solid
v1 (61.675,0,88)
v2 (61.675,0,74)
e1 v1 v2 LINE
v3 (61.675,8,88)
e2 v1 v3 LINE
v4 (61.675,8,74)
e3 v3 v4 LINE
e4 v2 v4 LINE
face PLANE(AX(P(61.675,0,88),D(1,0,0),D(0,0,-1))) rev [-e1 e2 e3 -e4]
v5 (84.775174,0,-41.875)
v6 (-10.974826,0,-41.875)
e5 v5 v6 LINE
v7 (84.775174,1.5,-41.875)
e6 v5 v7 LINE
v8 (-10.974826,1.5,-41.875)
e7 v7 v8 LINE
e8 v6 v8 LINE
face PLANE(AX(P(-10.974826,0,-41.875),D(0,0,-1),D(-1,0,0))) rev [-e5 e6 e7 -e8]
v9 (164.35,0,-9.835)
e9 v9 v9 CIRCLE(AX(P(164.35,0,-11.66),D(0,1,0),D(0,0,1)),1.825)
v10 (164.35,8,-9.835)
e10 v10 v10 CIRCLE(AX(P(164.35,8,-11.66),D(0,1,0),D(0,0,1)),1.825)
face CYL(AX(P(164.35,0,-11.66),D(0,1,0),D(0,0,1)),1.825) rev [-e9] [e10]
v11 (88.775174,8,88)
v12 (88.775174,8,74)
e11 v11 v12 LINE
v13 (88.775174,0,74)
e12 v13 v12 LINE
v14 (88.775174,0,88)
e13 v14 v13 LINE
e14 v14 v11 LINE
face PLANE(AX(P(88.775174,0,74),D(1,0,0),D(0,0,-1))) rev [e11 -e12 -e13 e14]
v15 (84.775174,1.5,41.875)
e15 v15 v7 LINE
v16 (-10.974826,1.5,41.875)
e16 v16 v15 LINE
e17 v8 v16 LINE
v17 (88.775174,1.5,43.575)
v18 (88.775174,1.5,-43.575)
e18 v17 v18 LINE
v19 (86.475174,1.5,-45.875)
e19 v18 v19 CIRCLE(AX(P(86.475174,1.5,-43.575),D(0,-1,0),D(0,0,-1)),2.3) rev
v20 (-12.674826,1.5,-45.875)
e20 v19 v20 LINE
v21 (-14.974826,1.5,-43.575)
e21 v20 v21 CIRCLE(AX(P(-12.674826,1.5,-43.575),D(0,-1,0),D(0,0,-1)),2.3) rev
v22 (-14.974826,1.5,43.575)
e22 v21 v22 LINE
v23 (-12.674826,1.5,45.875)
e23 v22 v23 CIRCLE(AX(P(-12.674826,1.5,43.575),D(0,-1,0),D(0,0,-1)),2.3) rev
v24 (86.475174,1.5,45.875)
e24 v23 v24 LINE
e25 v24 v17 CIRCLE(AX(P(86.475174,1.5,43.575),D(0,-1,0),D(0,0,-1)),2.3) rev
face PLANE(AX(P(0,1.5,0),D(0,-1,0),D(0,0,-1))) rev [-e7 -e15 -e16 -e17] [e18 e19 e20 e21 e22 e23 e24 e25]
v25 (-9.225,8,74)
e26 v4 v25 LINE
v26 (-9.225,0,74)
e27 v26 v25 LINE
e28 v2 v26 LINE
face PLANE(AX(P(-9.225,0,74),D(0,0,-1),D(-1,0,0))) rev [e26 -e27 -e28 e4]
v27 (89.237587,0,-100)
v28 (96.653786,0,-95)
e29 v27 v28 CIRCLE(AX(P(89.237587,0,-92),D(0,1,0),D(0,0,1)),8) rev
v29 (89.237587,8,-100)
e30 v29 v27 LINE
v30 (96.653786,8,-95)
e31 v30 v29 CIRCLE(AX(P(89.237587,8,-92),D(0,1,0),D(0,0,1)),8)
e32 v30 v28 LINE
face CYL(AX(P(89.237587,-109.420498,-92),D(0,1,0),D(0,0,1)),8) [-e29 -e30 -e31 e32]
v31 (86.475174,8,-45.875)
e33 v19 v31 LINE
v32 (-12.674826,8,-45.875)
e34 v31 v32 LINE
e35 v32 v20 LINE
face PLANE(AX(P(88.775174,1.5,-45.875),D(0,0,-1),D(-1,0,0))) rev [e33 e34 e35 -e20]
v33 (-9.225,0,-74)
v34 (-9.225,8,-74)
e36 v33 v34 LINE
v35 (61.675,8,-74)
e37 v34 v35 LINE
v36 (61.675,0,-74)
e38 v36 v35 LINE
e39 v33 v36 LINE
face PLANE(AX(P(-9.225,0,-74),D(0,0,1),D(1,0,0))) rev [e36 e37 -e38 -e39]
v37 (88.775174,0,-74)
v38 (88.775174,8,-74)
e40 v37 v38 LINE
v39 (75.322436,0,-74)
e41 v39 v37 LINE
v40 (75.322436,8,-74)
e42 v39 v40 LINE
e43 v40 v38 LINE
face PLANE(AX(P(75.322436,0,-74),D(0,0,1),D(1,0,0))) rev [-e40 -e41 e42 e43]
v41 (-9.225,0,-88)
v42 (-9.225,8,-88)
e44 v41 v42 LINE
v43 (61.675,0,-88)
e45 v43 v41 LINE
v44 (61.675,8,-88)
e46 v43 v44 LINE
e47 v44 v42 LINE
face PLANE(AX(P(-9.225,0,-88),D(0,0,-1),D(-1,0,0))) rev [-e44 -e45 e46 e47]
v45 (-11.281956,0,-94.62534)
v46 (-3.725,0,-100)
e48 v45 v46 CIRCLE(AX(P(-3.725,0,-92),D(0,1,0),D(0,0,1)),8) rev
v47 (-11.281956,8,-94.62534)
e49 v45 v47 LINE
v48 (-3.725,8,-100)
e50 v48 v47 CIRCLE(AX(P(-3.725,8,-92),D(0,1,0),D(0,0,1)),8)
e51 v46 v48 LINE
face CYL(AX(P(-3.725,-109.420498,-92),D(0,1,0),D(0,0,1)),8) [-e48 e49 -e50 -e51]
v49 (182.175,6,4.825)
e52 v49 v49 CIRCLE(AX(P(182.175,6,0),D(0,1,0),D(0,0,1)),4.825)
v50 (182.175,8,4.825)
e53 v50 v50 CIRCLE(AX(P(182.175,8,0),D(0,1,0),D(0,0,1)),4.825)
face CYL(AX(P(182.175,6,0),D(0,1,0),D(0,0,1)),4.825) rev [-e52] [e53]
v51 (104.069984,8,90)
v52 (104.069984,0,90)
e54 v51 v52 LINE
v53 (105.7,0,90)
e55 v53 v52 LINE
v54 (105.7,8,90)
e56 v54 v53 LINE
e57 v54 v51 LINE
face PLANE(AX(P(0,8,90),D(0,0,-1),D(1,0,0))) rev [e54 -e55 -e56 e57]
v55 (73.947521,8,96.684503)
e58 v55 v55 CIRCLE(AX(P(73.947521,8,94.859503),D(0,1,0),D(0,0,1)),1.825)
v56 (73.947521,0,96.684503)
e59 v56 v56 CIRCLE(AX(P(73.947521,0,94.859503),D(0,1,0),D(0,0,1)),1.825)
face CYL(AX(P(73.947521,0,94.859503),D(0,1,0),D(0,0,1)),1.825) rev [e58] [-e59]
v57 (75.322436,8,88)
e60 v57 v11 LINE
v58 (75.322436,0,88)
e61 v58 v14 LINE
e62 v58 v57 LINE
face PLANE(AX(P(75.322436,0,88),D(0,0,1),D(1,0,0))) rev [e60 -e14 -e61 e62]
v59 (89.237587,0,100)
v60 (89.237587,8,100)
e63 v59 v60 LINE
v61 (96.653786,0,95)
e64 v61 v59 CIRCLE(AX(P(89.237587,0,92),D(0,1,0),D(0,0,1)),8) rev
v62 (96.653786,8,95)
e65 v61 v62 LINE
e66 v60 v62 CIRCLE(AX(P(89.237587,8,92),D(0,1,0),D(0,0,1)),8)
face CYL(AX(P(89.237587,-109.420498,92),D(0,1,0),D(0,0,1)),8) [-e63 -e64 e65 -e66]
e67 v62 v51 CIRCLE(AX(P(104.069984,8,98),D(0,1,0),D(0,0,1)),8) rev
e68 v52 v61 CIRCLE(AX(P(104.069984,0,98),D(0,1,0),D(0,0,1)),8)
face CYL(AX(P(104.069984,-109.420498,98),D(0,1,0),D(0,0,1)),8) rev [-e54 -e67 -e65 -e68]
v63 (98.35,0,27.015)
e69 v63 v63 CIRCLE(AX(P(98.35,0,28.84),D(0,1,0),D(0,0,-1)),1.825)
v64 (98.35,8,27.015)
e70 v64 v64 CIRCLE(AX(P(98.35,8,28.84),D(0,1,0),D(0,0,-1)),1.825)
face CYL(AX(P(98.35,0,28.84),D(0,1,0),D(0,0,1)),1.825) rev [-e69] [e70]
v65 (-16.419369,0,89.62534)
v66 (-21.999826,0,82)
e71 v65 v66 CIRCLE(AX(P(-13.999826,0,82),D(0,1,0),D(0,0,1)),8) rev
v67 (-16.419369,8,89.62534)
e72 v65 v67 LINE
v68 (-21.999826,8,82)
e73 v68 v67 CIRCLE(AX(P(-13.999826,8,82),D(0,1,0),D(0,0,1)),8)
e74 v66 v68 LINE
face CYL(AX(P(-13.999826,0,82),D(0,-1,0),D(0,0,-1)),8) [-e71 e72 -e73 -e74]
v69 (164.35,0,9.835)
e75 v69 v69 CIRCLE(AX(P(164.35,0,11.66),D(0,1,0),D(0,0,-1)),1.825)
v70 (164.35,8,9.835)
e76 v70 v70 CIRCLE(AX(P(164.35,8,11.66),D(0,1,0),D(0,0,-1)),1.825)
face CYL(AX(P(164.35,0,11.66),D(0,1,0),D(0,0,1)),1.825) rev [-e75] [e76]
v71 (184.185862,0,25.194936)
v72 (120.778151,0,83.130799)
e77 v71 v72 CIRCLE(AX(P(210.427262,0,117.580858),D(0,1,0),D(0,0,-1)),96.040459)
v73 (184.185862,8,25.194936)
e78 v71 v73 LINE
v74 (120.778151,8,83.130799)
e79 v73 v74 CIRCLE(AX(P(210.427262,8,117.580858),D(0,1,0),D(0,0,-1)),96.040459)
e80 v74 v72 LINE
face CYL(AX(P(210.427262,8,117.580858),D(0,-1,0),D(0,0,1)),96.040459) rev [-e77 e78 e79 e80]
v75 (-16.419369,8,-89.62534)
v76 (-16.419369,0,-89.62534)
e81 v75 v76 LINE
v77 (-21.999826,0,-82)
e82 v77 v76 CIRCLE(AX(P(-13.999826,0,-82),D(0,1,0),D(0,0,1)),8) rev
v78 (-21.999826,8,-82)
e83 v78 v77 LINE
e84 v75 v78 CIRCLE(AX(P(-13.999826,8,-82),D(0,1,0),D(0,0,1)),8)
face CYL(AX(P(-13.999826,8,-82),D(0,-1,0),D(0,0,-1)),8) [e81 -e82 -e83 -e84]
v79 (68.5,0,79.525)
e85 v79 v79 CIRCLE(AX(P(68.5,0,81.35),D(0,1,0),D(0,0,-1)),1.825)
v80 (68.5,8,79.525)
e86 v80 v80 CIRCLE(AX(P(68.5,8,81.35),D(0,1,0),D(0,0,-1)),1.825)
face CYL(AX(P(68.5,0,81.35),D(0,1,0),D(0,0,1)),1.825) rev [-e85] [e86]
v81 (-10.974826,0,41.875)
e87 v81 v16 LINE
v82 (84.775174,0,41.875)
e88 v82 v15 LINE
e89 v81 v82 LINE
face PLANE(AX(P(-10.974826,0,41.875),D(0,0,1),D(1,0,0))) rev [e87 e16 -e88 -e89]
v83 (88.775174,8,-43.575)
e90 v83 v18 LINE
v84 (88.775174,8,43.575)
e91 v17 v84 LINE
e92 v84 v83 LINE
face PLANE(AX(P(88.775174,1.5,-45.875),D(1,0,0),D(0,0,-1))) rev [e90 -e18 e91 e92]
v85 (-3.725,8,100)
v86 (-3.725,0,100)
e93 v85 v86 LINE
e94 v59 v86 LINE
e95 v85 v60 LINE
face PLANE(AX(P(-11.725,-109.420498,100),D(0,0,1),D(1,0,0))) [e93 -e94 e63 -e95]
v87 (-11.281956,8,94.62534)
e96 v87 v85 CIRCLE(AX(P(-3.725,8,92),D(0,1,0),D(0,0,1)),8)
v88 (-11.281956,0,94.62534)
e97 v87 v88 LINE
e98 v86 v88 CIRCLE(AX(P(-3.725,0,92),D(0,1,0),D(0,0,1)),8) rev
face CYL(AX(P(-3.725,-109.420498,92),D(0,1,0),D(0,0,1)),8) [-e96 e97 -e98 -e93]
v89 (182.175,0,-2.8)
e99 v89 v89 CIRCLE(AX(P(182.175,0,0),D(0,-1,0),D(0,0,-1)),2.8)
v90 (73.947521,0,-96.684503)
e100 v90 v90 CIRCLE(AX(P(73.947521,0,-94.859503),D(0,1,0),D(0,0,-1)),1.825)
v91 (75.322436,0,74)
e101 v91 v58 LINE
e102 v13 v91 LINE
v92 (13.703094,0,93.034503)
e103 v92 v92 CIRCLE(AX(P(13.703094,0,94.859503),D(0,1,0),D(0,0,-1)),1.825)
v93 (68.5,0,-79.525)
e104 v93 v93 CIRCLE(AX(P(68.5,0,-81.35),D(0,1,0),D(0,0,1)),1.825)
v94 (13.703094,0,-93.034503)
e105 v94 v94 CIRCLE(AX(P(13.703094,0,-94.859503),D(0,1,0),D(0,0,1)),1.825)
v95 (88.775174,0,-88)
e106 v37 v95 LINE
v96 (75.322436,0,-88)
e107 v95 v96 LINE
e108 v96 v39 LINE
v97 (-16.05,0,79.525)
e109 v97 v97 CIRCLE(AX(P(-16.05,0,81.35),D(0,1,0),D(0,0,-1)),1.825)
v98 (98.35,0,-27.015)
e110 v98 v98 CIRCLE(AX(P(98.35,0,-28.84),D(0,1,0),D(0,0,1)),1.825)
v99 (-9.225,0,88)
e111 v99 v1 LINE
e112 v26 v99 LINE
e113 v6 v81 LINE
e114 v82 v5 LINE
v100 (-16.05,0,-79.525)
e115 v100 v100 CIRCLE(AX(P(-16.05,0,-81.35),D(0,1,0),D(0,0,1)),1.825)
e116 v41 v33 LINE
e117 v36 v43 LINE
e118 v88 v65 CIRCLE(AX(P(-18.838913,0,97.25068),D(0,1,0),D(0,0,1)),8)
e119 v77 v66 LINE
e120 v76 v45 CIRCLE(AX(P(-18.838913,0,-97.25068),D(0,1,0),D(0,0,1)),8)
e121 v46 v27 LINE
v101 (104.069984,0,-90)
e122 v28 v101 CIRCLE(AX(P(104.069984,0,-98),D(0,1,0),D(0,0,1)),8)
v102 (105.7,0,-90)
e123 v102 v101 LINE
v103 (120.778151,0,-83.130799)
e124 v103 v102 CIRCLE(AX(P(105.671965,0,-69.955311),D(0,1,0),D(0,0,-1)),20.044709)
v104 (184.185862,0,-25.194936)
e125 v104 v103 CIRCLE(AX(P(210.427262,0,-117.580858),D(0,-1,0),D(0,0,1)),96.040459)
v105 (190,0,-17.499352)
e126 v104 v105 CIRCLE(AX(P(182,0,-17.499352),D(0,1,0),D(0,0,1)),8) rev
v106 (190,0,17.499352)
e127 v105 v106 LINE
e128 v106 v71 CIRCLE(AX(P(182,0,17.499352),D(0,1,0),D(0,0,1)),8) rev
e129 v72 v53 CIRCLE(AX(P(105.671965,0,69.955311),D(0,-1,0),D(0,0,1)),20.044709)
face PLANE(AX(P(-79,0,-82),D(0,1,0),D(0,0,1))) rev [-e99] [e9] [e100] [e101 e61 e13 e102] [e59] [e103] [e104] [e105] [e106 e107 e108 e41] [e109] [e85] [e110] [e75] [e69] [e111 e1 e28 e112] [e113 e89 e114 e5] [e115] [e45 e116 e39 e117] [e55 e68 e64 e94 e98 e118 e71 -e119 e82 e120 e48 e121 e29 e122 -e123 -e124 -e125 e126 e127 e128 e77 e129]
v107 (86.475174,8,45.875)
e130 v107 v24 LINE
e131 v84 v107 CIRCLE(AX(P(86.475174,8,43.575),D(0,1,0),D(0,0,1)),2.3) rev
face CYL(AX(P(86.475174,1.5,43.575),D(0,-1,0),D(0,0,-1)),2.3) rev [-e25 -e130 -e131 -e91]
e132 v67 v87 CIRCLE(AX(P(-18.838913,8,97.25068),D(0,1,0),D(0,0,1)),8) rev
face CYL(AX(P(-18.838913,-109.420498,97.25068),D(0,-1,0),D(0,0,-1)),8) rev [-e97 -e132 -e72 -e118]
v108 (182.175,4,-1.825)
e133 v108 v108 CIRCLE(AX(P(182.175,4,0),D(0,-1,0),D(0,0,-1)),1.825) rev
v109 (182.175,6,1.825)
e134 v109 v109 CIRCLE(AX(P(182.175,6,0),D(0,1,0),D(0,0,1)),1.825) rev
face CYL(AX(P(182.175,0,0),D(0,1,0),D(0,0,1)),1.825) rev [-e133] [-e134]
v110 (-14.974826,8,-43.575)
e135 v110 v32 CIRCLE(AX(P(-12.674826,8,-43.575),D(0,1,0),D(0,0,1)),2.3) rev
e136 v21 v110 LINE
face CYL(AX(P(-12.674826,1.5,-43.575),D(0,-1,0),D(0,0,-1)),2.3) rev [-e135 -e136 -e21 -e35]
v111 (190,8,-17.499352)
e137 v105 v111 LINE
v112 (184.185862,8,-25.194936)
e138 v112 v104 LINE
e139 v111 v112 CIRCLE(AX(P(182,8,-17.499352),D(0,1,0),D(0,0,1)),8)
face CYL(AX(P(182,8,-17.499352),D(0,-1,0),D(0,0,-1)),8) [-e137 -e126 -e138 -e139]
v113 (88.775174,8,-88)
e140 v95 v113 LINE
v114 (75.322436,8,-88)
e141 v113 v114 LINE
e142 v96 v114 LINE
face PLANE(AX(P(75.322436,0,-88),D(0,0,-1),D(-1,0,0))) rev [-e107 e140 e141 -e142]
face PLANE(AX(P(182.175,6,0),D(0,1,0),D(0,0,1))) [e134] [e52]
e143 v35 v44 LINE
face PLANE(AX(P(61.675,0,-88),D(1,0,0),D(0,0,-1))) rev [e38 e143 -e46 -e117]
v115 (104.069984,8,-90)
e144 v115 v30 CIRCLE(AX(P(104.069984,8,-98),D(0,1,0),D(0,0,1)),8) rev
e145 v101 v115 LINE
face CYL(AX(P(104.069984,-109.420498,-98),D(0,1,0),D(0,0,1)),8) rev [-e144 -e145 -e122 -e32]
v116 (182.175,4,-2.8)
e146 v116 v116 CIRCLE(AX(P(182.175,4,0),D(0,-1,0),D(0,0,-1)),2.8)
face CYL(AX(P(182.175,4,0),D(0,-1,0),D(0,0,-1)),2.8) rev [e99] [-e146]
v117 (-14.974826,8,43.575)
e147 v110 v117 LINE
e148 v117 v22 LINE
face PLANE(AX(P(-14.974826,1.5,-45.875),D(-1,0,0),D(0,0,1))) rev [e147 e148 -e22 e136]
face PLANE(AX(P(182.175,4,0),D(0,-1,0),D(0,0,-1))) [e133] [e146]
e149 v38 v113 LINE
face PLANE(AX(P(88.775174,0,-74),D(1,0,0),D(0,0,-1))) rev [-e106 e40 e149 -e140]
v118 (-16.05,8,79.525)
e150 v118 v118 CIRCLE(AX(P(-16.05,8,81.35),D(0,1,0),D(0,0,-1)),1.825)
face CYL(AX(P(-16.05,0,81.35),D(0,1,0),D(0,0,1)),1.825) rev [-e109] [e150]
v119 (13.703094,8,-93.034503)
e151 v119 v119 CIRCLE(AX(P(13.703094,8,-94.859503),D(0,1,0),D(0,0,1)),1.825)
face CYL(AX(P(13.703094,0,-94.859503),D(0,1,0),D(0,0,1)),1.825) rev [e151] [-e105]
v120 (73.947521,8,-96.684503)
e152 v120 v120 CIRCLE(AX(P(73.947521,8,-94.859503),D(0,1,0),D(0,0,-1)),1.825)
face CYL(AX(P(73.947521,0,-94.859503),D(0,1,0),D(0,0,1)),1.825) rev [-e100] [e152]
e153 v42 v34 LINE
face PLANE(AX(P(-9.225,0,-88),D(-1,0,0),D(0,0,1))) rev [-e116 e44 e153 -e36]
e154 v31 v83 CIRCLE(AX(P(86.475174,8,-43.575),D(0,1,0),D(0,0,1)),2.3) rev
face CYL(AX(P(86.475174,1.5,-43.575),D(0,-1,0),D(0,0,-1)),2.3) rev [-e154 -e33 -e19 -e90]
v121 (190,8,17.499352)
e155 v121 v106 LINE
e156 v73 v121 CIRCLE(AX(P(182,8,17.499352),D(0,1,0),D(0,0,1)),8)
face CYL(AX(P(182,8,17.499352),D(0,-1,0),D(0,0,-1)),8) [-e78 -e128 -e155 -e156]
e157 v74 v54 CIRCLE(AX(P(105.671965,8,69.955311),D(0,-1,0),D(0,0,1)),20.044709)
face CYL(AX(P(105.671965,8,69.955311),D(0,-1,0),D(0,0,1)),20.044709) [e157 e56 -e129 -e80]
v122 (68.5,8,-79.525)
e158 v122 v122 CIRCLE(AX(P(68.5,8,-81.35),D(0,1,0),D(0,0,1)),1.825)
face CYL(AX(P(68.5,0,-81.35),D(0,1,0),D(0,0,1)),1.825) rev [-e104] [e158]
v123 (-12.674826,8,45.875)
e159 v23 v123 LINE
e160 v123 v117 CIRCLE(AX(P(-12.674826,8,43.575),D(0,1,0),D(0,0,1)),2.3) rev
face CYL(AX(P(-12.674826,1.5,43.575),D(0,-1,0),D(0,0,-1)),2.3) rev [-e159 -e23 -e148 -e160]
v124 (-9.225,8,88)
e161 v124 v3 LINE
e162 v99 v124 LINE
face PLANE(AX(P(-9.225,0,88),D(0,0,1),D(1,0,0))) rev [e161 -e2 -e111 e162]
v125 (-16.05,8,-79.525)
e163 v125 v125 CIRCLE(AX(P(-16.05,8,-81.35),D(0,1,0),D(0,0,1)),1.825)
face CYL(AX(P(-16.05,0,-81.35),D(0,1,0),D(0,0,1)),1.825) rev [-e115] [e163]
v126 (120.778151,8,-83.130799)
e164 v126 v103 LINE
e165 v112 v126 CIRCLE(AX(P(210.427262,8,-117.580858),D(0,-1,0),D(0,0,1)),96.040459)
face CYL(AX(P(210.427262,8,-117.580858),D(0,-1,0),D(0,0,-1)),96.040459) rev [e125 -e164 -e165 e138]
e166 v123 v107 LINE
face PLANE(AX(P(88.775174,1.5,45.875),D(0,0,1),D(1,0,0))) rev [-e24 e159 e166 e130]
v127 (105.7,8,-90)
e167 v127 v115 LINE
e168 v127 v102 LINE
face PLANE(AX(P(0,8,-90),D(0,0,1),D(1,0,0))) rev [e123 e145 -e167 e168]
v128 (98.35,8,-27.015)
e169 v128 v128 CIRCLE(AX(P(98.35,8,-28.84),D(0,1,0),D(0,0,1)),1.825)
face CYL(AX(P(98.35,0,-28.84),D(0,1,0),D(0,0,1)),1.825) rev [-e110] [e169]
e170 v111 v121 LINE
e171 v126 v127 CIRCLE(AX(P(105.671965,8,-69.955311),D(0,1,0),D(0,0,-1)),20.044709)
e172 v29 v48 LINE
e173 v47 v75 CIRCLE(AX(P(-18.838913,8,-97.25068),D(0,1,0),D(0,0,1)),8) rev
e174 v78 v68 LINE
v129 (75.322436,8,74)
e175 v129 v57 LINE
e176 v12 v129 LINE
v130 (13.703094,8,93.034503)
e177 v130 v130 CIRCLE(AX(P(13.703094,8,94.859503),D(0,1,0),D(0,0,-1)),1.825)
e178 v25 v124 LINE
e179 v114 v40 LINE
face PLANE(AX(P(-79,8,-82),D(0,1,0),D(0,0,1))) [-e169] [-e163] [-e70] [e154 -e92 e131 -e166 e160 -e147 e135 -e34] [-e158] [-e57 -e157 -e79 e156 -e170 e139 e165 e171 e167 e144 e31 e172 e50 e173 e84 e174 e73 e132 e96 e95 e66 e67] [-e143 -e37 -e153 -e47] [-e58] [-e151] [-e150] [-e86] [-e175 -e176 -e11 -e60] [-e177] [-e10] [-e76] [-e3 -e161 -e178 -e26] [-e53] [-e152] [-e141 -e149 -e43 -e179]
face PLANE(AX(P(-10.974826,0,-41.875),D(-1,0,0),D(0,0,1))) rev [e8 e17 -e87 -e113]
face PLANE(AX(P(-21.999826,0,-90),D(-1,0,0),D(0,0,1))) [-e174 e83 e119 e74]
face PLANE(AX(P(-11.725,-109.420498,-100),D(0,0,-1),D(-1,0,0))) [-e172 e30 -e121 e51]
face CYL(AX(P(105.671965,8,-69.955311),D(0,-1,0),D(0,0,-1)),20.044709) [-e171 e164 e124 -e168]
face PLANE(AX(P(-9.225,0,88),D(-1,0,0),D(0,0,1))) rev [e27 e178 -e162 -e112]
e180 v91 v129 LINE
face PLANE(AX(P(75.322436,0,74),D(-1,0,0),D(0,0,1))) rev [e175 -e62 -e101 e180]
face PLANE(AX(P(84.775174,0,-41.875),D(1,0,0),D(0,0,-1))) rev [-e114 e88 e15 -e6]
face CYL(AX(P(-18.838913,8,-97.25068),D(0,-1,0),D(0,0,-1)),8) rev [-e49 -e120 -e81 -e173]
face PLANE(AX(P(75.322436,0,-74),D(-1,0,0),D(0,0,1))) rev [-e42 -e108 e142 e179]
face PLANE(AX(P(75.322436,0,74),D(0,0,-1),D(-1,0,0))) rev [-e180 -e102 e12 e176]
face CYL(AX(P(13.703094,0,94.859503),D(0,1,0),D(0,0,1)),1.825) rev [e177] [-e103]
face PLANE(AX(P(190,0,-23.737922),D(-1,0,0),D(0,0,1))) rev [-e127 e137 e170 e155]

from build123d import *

# Parameters (mm, degrees)
SALIENTE_EXTRUIR1_DEPTH = 8
CROQUIS2_R              = 1.825
CORTAR_EXTRUIR1_DEPTH   = 220.463870727
CROQUIS3_R              = 1.825
CORTAR_EXTRUIR2_DEPTH   = 220.463870727
CROQUIS4_W              = 103.75
CROQUIS4_H              = 91.75
CORTAR_EXTRUIR3_DEPTH   = 6.5
REDONDEO1_R             = 2.3
CROQUIS5_R              = 1.825
CORTAR_EXTRUIR4_DEPTH   = 220.463870727
CROQUIS20_W             = 70.9
CROQUIS20_H             = 14
CROQUIS20_W_2           = 13.452738683
CORTAR_EXTRUIR15_DEPTH  = 220.463870727
CROQUIS6_W              = 95.75
CROQUIS6_H              = 83.75
CORTAR_EXTRUIR5_DEPTH   = 220.414312556
CROQUIS9_R              = 1.825
CORTAR_EXTRUIR7_DEPTH   = 220.463870727
CROQUIS12_W             = 65
CROQUIS12_H             = 180
CORTAR_EXTRUIR9_DEPTH   = 220.463870727
REDONDEO2_R             = 8
CROQUIS14_R             = 1.825
CORTAR_EXTRUIR11_DEPTH  = 220.463870727
CROQUIS15_R             = 4.825
CORTAR_EXTRUIR12_DEPTH  = 2
CROQUIS16_W             = 11
CROQUIS16_H             = 47.47584408
CORTAR_EXTRUIR13_DEPTH  = 220.463870727
REDONDEO3_R             = 8
CROQUIS18_R             = 2.8
CORTAR_EXTRUIR14_DEPTH  = 4
CROQUIS21_W             = 108.962587205
CROQUIS21_H             = 10
SALIENTE_EXTRUIR9_DEPTH = 8
REDONDEO5_R             = 8
REDONDEO6_R             = 8
CROQUIS22_R             = 1.825
CORTAR_EXTRUIR16_DEPTH  = 215.858092703


with BuildPart() as part:
    # Croquis1 → Saliente-Extruir1 (new body)
    with BuildSketch(Plane(origin=(0, 0, 0), x_dir=(1, 0, 0), z_dir=(0, 1, 0))):
        with BuildLine():
            Line((0, 0), (200, 0))
            Line((200, 0), (200, 15.2))
            ThreePointArc((200, 15.2), (197.701163079, 20.938172036), (191.9990235, 23.3249845))
            ThreePointArc((191.9990235, 23.3249845), (148.666739026, 44.032184001), (120.7781513, 83.1307986))
            ThreePointArc((120.7781513, 83.1307986), (113.982057966, 88.196272982), (105.7, 90))
            Line((105.7, 90), (0, 90))
            Line((0, 90), (-79, 90))
            ThreePointArc((-79, 90), (-84.638146896, 87.675499941), (-86.999825594, 82.052824894))
            Line((-86.999825594, 82.052824894), (-86.999825594, 41.494023494))
            Line((-86.999825594, 41.494023494), (-86.999825594, 0))
            Line((-86.999825594, 0), (0, 0))
        make_face()
    extrude(amount=SALIENTE_EXTRUIR1_DEPTH)

    # Simetría2: part across plane


with BuildPart() as part_1:
    add(part.part)
    add(part.part.mirror(Plane(origin=(0, 8, 0), x_dir=(1, 0, 0), z_dir=(0, 0, -1))))

    # Croquis2 → Cortar-Extruir1 (cut, through all)
    with BuildSketch(Plane(origin=(0, 8, 0), x_dir=(1, 0, 0), z_dir=(0, 1, 0))):
        with Locations(Location((68.5, 81.35, 0), (0, 0, 270))):
            Circle(CROQUIS2_R)
        with Locations(Location((-16.05, 81.35, 0), (0, 0, 270))):
            Circle(CROQUIS2_R)
        with Locations(Location((68.5, -81.35, 0), (0, 0, 90))):
            Circle(CROQUIS2_R)
        with Locations(Location((-16.05, -81.35, 0), (0, 0, 90))):
            Circle(CROQUIS2_R)
    extrude(amount=-CORTAR_EXTRUIR1_DEPTH, mode=Mode.SUBTRACT)

    # Croquis3 → Cortar-Extruir2 (cut, through all)
    with BuildSketch(Plane(origin=(0, 8, 0), x_dir=(1, 0, 0), z_dir=(0, 1, 0))):
        with Locations(Location((-76.999825594, -46.75, 0), (0, 0, 270))):
            Circle(CROQUIS3_R)
        with Locations(Location((-34.999825594, -46.75, 0), (0, 0, 270))):
            Circle(CROQUIS3_R)
        with Locations(Location((-34.999825594, 46.75, 0), (0, 0, 90))):
            Circle(CROQUIS3_R)
        with Locations(Location((-76.999825594, 46.75, 0), (0, 0, 90))):
            Circle(CROQUIS3_R)
    extrude(amount=-CORTAR_EXTRUIR2_DEPTH, mode=Mode.SUBTRACT)

    # Croquis4 → Cortar-Extruir3 (cut)
    with BuildSketch(Plane(origin=(0, 8, 0), x_dir=(1, 0, 0), z_dir=(0, 1, 0))):
        with Locations((36.90017441, 0)):
            Rectangle(CROQUIS4_W, CROQUIS4_H)
    extrude(amount=-CORTAR_EXTRUIR3_DEPTH, mode=Mode.SUBTRACT)

    # Redondeo1
    redondeo1_edges = [part_1.edges().sort_by_distance(p)[0] for p in [
        (88.77517441, 4.75, -45.875),
        (88.77517441, 4.75, 45.875),
        (-14.97482559, 4.75, 45.875),
        (-14.97482559, 4.75, -45.875),
    ]]
    fillet(redondeo1_edges, radius=REDONDEO1_R)

    # Croquis5 → Cortar-Extruir4 (cut, through all)
    with BuildSketch(Plane(origin=(0, 8, 0), x_dir=(1, 0, 0), z_dir=(0, 1, 0))):
        with Locations(Location((98.35, 28.84, 0), (0, 0, 270))):
            Circle(CROQUIS5_R)
        with Locations(Location((98.35, -28.84, 0), (0, 0, 90))):
            Circle(CROQUIS5_R)
        with Locations(Location((164.35, 11.66, 0), (0, 0, 270))):
            Circle(CROQUIS5_R)
        with Locations(Location((164.35, -11.66, 0), (0, 0, 90))):
            Circle(CROQUIS5_R)
    extrude(amount=-CORTAR_EXTRUIR4_DEPTH, mode=Mode.SUBTRACT)

    # Croquis20 → Cortar-Extruir15 (cut, through all)
    with BuildSketch(Plane(origin=(0, 8, 0), x_dir=(1, 0, 0), z_dir=(0, 1, 0))):
        with Locations((26.225, -81)):
            Rectangle(CROQUIS20_W, CROQUIS20_H)
        with Locations((82.048805069, -81)):
            Rectangle(CROQUIS20_W_2, CROQUIS20_H)
        with Locations((82.048805069, 81)):
            Rectangle(CROQUIS20_W_2, CROQUIS20_H)
        with Locations((26.225, 81)):
            Rectangle(CROQUIS20_W, CROQUIS20_H)
    extrude(amount=-CORTAR_EXTRUIR15_DEPTH, mode=Mode.SUBTRACT)

    # Croquis6 → Cortar-Extruir5 (cut, through all)
    with BuildSketch(Plane(origin=(0, 1.5, 0), x_dir=(1, 0, 0), z_dir=(0, 1, 0))):
        with Locations((36.90017441, 0)):
            Rectangle(CROQUIS6_W, CROQUIS6_H)
    extrude(amount=-CORTAR_EXTRUIR5_DEPTH, mode=Mode.SUBTRACT)

    # Croquis9 → Cortar-Extruir7 (cut, through all)
    with BuildSketch(Plane(origin=(0, 8, 0), x_dir=(1, 0, 0), z_dir=(0, 1, 0))):
        with Locations(Location((-80.675393895, -75.767215538, 0), (0, 0, 270))):
            Circle(CROQUIS9_R)
        with Locations(Location((-58.52366486, -80.370640978, 0), (0, 0, 270))):
            Circle(CROQUIS9_R)
        with Locations(Location((-58.52366486, 80.370640978, 0), (0, 0, 90))):
            Circle(CROQUIS9_R)
        with Locations(Location((-80.675393895, 75.767215538, 0), (0, 0, 90))):
            Circle(CROQUIS9_R)
    extrude(amount=-CORTAR_EXTRUIR7_DEPTH, mode=Mode.SUBTRACT)

    # Croquis12 → Cortar-Extruir9 (cut, through all)
    with BuildSketch(Plane(origin=(0, 8, 0), x_dir=(1, 0, 0), z_dir=(0, 1, 0))):
        with Locations((-54.499825594, 0)):
            Rectangle(CROQUIS12_W, CROQUIS12_H)
    extrude(amount=-CORTAR_EXTRUIR9_DEPTH, mode=Mode.SUBTRACT)

    # Redondeo2
    redondeo2_edges = [part_1.edges().sort_by_distance(p)[0] for p in [
        (-21.999825594, 4, 90),
        (-21.999825594, 4, -90),
    ]]
    fillet(redondeo2_edges, radius=REDONDEO2_R)

    # Croquis14 → Cortar-Extruir11 (cut, through all)
    with BuildSketch(Plane(origin=(0, 8, 0), x_dir=(1, 0, 0), z_dir=(0, 1, 0))):
        with Locations(Location((182.175, 0, 0), (0, 0, 270))):
            Circle(CROQUIS14_R)
    extrude(amount=-CORTAR_EXTRUIR11_DEPTH, mode=Mode.SUBTRACT)

    # Croquis15 → Cortar-Extruir12 (cut)
    with BuildSketch(Plane(origin=(0, 8, 0), x_dir=(1, 0, 0), z_dir=(0, 1, 0))):
        with Locations(Location((182.175, 0, 0), (0, 0, 270))):
            Circle(CROQUIS15_R)
    extrude(amount=-CORTAR_EXTRUIR12_DEPTH, mode=Mode.SUBTRACT)

    # Croquis16 → Cortar-Extruir13 (cut, through all)
    with BuildSketch(Plane(origin=(0, 8, 0), x_dir=(1, 0, 0), z_dir=(0, 1, 0))):
        with Locations((195.5, 0)):
            Rectangle(CROQUIS16_W, CROQUIS16_H)
    extrude(amount=-CORTAR_EXTRUIR13_DEPTH, mode=Mode.SUBTRACT)

    # Redondeo3
    redondeo3_edges = [part_1.edges().sort_by_distance(p)[0] for p in [
        (190, 4, 23.73792204),
        (190, 4, -23.73792204),
    ]]
    fillet(redondeo3_edges, radius=REDONDEO3_R)

    # Croquis18 → Cortar-Extruir14 (cut)
    with BuildSketch(Plane.XZ):
        with Locations(Location((182.175, 0, 0), (0, 0, 270))):
            Circle(CROQUIS18_R)
    extrude(amount=-CORTAR_EXTRUIR14_DEPTH, mode=Mode.SUBTRACT)

    # Croquis21 → Saliente-Extruir9 (add)
    with BuildSketch(Plane(origin=(0, 8, 0), x_dir=(1, 0, 0), z_dir=(0, 1, 0))):
        with Locations((42.756293603, 95)):
            Rectangle(CROQUIS21_W, CROQUIS21_H)
        with Locations((42.756293603, -95)):
            Rectangle(CROQUIS21_W, CROQUIS21_H)
    extrude(amount=-SALIENTE_EXTRUIR9_DEPTH)

    # Redondeo5
    redondeo5_edges = [part_1.edges().sort_by_distance(p)[0] for p in [
        (-11.725, 4, -100),
        (97.237587205, 4, -100),
        (-11.725, 4, 100),
        (97.237587205, 4, 100),
    ]]
    fillet(redondeo5_edges, radius=REDONDEO5_R)

    # Redondeo6
    # the kernel refuses this fillet: 8 mm, written as the material it adds along each edge
    with BuildSketch(Plane(origin=(-11.725, 8, -90), x_dir=(0.09534974833302788, 0, -0.9954438334194594), z_dir=(0, -1, 0))) as redondeo6_piece_1:
        with BuildLine():
            CenterArc((6.539334701, -7.772851171), REDONDEO6_R, 103.686136853, 53.238021041)
            Line((-0.820560007, -4.637257147), (-1.556549478, -4.323697744))
            ThreePointArc((-1.556549478, -4.323697744), (-1.013259115, -2.188181311), (-0.796355067, 0.076279799))
            Line((-0.796355067, 0.076279799), (0.076279799, 0.796355067))
            ThreePointArc((0.076279799, 0.796355067), (2.067167466, 0.60565557), (4.457227725, 0.777285117))
            Line((4.457227725, 0.777285117), (4.646510177, 0))
        make_face()
    extrude(amount=8)
    with BuildSketch(Plane(origin=(97.237587205, 8, -90), x_dir=(-0.11597245427471743, 0, -0.9932524300748017), z_dir=(0, -1, 0))) as redondeo6_piece_2:
        with BuildLine():
            CenterArc((7.153649595, 7.714074532), REDONDEO6_R, 186.659717889, 67.975687163)
            Line((-0.792369846, 6.786294898), (-1.58697179, 6.693516934))
            Line((-1.58697179, 6.693516934), (-0.794601944, -0.092777963))
            Line((-0.794601944, -0.092777963), (0.092777963, -0.794601944))
            ThreePointArc((0.092777963, -0.794601944), (2.079282824, -0.562657036), (4.82199879, -0.771407453))
            Line((4.82199879, -0.771407453), (5.033967045, 0))
        make_face()
    extrude(amount=8)
    with BuildSketch(Plane(origin=(-11.725, 8, 90), x_dir=(-0.996830274314205, 0, -0.07955755281974515), z_dir=(0, -1, 0))) as redondeo6_piece_3:
        with BuildLine():
            CenterArc((6.514517354, -7.793662637), REDONDEO6_R, 103.04125749, 53.238021041)
            Line((-0.809619973, -4.575431382), (-1.542033706, -4.253608256))
            ThreePointArc((-1.542033706, -4.253608256), (-0.956579325, -1.930014506), (-0.797464219, 0.063646042))
            Line((-0.797464219, 0.063646042), (0.063646042, 0.797464219))
            ThreePointArc((0.063646042, 0.797464219), (2.331261063, 0.616484662), (4.528774303, 0.779366264))
            Line((4.528774303, 0.779366264), (4.709296399, 0))
        make_face()
    extrude(amount=8)
    with BuildSketch(Plane(origin=(97.237587205, 8, 90), x_dir=(1, 0, 0), z_dir=(0, -1, 0))) as redondeo6_piece_4:
        with BuildLine():
            CenterArc((6.832396974, 8), REDONDEO6_R, 202.024312837, 67.975687163)
            Line((-0.583801513, 5), (-1.325421362, 4.7))
            ThreePointArc((-1.325421362, 4.7), (-0.8, 2), (-0.8, 0))
            Line((-0.8, 0), (0, -0.8))
            Line((0, -0.8), (6.832396974, -0.8))
            Line((6.832396974, -0.8), (6.832396974, 0))
        make_face()
    extrude(amount=8)
    # the kernel refuses this fillet: 8 mm, written as the material it takes off along each edge

    # Croquis22 → Cortar-Extruir16 (cut, through all)
    with BuildSketch(Plane(origin=(0, 8, 0), x_dir=(1, 0, 0), z_dir=(0, 1, 0))):
        with Locations(Location((13.703094373, 94.859502658, 0), (0, 0, 270))):
            Circle(CROQUIS22_R)
        with Locations(Location((73.947520586, 94.859502658, 0), (0, 0, 90))):
            Circle(CROQUIS22_R)
        with Locations(Location((73.947520586, -94.859502658, 0), (0, 0, 270))):
            Circle(CROQUIS22_R)
        with Locations(Location((13.703094373, -94.859502658, 0), (0, 0, 90))):
            Circle(CROQUIS22_R)
    extrude(amount=-CORTAR_EXTRUIR16_DEPTH, mode=Mode.SUBTRACT)


solid = part_1.part
